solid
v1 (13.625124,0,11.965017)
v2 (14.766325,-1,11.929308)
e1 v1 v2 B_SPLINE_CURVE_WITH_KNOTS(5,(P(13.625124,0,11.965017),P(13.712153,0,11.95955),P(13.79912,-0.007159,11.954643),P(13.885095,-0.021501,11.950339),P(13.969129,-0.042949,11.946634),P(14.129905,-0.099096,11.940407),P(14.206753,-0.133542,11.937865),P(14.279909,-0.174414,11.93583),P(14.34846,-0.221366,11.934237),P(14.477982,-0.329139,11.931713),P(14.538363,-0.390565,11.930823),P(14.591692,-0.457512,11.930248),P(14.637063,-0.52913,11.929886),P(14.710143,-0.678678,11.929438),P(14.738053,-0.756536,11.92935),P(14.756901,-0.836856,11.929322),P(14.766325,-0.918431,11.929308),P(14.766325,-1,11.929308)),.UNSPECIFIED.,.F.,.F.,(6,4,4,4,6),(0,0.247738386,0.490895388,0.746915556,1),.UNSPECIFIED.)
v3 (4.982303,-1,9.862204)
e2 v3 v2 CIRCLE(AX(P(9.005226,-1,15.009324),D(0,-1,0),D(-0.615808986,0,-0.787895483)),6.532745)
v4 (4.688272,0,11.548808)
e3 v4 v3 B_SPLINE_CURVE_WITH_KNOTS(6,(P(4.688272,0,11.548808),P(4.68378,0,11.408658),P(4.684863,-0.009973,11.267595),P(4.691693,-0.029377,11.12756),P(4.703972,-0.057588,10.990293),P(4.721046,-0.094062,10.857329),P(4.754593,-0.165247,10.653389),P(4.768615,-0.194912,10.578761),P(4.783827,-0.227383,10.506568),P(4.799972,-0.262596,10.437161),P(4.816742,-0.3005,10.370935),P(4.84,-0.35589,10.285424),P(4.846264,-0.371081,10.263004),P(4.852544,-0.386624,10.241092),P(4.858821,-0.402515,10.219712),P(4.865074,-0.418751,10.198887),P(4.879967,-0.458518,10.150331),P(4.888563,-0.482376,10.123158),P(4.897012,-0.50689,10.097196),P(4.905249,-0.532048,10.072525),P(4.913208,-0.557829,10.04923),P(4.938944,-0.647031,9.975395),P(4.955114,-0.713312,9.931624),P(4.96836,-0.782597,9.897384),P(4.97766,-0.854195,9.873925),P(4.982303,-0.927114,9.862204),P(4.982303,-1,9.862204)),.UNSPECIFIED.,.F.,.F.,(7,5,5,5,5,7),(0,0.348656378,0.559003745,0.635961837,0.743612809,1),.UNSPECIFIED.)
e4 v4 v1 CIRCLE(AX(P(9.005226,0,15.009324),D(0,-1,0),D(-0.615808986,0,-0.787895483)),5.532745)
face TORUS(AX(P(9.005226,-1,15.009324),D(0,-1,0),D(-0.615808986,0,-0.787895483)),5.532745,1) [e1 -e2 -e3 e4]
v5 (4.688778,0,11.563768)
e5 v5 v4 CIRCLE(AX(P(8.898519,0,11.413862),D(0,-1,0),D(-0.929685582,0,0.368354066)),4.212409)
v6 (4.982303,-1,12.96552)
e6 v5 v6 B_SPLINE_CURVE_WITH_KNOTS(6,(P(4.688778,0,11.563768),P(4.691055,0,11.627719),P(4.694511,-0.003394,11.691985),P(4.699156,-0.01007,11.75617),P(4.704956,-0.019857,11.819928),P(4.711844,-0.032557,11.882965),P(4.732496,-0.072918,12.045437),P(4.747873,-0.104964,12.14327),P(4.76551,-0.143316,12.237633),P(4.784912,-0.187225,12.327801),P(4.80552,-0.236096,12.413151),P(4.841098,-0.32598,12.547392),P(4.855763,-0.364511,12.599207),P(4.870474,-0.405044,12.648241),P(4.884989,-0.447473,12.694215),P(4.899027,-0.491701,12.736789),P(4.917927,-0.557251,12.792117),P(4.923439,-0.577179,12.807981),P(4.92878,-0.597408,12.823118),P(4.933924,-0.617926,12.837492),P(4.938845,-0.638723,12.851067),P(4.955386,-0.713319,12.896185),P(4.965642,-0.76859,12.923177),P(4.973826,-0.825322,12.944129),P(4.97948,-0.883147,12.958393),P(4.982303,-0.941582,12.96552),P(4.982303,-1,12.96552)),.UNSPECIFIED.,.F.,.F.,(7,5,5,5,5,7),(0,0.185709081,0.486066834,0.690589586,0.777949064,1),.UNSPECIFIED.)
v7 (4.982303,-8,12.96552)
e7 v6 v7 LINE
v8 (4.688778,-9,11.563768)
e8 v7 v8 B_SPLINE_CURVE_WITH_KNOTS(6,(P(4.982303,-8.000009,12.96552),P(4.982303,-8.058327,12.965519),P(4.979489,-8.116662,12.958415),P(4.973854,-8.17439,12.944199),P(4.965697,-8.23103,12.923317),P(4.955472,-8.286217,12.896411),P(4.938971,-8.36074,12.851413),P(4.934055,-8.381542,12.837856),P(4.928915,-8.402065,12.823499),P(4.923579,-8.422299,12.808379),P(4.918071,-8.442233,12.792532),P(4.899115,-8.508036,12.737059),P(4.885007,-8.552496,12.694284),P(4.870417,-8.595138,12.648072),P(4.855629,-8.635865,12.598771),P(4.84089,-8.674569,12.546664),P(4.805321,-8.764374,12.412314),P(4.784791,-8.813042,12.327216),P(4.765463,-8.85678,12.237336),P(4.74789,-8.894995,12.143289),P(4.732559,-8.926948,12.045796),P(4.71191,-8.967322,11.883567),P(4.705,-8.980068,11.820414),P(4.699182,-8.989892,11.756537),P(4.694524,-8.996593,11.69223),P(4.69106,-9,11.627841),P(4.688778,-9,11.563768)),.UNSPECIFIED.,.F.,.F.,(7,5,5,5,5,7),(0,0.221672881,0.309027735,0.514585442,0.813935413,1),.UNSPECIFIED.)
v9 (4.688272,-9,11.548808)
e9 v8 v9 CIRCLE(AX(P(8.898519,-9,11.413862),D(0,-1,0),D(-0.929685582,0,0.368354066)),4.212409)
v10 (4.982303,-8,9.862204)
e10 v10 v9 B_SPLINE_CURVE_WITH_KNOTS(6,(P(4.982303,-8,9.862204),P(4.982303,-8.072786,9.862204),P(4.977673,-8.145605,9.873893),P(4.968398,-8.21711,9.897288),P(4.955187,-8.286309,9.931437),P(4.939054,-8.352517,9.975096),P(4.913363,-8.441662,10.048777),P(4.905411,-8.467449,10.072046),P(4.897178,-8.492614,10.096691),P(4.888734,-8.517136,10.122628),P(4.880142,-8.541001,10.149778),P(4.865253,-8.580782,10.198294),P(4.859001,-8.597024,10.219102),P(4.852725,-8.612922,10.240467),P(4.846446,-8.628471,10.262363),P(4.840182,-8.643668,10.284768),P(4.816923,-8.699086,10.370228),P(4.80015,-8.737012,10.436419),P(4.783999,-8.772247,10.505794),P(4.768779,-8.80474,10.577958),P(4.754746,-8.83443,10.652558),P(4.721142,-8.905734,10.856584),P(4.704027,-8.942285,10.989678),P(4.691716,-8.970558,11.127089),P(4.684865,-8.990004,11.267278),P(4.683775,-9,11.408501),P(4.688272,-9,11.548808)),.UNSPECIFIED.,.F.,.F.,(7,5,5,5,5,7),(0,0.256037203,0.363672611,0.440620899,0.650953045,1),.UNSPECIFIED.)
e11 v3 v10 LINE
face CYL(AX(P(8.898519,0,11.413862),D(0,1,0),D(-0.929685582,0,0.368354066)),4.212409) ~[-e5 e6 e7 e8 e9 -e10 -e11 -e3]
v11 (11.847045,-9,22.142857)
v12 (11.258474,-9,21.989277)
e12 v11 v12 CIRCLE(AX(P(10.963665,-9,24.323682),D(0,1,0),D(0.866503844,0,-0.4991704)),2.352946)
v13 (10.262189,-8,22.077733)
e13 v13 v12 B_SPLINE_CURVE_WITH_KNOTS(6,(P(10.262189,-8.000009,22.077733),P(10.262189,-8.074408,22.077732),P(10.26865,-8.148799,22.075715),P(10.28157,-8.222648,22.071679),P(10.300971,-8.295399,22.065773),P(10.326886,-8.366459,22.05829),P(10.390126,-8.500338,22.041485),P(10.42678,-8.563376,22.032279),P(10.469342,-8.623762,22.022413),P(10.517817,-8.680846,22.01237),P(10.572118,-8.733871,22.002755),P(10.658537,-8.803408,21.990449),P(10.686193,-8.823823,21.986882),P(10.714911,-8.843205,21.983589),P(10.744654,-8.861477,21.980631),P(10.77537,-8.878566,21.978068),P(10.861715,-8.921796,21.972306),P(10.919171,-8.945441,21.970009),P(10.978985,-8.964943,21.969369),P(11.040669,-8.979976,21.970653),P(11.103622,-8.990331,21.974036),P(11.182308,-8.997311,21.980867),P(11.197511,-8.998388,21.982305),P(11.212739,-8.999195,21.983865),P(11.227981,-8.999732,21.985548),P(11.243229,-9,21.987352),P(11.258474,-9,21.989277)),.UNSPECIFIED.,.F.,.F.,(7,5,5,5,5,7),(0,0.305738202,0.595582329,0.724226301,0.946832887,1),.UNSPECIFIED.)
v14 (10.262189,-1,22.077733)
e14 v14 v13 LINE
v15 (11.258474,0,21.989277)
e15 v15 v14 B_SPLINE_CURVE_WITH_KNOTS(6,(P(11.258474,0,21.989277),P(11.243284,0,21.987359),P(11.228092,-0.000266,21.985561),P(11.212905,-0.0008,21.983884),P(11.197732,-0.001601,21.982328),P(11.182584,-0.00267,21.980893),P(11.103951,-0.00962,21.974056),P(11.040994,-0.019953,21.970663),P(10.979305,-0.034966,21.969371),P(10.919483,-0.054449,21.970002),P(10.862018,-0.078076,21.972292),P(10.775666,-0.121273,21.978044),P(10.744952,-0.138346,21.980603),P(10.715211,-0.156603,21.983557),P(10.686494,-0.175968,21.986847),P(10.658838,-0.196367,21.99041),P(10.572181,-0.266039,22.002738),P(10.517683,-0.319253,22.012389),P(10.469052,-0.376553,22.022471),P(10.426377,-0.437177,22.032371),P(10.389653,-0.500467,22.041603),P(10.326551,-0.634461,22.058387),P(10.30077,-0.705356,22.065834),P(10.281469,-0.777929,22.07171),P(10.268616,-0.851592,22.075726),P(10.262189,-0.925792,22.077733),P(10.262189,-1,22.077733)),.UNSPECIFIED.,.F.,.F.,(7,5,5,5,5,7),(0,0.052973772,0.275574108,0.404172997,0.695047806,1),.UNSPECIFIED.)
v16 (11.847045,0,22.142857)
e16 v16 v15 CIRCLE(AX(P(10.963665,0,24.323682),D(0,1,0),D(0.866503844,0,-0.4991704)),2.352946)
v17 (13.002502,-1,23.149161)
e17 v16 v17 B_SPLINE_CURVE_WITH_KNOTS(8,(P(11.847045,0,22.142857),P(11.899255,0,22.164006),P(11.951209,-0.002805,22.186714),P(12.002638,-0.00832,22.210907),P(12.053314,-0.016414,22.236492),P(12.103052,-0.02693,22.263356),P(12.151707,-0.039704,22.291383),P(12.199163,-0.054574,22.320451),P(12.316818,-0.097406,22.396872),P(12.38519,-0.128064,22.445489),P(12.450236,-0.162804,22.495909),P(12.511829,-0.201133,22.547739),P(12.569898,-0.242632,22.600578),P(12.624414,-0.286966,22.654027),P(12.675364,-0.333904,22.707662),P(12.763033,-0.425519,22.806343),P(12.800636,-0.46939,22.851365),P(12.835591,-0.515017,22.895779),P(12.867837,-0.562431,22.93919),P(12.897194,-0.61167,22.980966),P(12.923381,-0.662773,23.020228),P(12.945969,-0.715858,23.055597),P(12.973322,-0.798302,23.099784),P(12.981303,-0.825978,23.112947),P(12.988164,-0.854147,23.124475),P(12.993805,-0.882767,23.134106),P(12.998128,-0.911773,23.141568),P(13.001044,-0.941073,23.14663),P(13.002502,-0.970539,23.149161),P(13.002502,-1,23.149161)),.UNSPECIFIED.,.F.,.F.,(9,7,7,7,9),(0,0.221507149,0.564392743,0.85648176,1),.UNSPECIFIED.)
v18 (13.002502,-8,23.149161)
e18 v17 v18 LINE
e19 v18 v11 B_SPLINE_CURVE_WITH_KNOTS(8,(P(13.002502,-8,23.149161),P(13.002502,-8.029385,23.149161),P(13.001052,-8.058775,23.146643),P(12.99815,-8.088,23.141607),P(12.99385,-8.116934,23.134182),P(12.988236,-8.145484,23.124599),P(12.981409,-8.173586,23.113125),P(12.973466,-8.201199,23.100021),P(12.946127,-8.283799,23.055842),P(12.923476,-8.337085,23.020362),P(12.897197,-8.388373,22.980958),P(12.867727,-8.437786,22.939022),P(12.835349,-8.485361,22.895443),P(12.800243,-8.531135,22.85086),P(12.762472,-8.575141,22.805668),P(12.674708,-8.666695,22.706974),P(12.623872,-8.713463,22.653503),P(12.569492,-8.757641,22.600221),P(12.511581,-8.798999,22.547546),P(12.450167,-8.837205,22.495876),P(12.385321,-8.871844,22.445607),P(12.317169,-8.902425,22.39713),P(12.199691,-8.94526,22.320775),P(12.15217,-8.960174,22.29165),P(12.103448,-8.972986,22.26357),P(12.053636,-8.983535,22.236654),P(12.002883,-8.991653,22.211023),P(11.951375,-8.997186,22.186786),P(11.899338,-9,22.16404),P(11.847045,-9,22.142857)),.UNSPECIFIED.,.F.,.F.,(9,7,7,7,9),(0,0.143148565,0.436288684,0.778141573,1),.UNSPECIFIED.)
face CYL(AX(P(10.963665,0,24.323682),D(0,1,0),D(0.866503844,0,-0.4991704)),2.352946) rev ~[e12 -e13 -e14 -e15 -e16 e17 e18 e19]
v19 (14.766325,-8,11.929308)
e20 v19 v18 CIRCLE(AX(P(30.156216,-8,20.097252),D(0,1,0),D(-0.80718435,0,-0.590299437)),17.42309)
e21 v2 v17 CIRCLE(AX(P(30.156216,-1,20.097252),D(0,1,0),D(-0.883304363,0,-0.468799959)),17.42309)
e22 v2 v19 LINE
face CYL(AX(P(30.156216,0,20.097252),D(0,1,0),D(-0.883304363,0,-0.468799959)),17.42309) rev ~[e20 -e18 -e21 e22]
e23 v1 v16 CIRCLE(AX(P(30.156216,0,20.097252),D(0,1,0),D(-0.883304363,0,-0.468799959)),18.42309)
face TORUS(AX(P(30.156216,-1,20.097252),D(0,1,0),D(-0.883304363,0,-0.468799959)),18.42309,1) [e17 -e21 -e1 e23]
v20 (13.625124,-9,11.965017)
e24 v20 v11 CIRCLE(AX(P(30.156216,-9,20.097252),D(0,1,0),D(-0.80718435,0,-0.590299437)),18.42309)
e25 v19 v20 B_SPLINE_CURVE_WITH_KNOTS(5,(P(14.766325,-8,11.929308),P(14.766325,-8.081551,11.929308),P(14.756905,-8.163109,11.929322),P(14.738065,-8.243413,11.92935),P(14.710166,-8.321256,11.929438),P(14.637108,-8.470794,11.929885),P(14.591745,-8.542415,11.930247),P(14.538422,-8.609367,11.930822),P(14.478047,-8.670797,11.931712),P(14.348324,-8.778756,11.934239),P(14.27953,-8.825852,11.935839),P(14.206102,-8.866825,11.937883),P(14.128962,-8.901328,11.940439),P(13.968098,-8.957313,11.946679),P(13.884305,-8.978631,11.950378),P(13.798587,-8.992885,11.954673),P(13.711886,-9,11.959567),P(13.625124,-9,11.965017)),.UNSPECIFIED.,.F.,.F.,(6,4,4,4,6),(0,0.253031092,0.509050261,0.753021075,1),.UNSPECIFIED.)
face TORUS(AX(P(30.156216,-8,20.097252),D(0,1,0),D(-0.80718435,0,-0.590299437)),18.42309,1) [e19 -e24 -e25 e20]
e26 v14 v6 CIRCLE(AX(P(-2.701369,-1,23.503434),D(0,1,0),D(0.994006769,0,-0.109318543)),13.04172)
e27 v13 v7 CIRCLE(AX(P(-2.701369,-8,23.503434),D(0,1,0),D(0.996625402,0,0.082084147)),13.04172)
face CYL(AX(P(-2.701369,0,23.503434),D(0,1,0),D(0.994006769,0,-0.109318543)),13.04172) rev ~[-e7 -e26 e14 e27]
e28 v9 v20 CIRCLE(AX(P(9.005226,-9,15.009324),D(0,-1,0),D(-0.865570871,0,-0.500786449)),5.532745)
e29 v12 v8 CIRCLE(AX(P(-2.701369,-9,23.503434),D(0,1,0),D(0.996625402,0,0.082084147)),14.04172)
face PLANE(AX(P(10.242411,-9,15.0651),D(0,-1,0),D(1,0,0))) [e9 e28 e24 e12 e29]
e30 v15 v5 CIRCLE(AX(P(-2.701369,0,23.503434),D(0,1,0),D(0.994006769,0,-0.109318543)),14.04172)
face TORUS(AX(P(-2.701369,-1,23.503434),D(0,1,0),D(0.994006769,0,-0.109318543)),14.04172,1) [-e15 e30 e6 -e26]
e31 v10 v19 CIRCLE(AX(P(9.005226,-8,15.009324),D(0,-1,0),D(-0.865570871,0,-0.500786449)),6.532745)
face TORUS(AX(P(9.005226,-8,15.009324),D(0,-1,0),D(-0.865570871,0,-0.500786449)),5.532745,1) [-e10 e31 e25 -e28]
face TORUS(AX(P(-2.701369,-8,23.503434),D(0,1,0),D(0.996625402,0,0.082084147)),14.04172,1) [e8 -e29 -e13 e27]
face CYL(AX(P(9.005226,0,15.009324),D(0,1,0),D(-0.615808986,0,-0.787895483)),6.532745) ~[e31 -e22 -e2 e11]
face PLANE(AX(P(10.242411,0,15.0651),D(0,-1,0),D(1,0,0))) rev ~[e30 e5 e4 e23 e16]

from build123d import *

# Parameters (mm, degrees)
F1_DEPTH    = 9
F2_T2_ANGLE = 69.5952889026
F2_T4_ANGLE = 54.4883301746
F2_T6_ANGLE = 143.7551987737
F3_R        = 1


# Not quite as in the source:
# - a fillet or chamfer that OpenCascade refuses, or shapes differently, is made with other operations: its cross-section is extruded or revolved along the edge and cut away or added


with BuildPart() as f1:
    # F0 (on Front) → F1 (new body)
    with BuildSketch(Plane.XZ):
        with BuildLine():
            ThreePointArc((14.7663247772, 11.9293080643), (12.944509625, 17.3914763041), (13.0025018007, 23.1491606683))
            ThreePointArc((13.0025018007, 23.1491606683), (11.8204746449, 22.132281974), (10.26218878, 22.0777325565))
            ThreePointArc((10.26218878, 22.0777325565), (8.5829178564, 16.9649844736), (4.9823031081, 12.9655198559))
            ThreePointArc((4.9823031081, 12.9655198559), (4.6861100149, 11.4138618351), (4.9823031081, 9.8622038143))
            ThreePointArc((4.9823031081, 9.8622038143), (10.3556125988, 8.6176722475), (14.7663247772, 11.9293080643))
        make_face()
    extrude(amount=F1_DEPTH)

    # F2: fillet of radius 1 on 3 edges, made by hand

    # F2_s1 → F2_t2 (revolve, cut)
    with BuildSketch(Plane(origin=(-1.9409501927, 0, 23.5660641142), x_dir=(0, 1, 0), z_dir=(-0.0820841468, 0, 0.9966254025))):
        with BuildLine():
            ThreePointArc((-8, -12.2787262208), (-8.7071067812, -12.5716194396), (-9, -13.2787262208))
            Line((-9, -13.2787262208), (-9, -12.2787262208))
            Line((-9, -12.2787262208), (-8, -12.2787262208))
        make_face()
    revolve(axis=Axis((-2.70136938, -9, 23.5034344039), (0, 1, 0)), revolution_arc=F2_T2_ANGLE, mode=Mode.SUBTRACT)

    # F2_s3 → F2_t4 (revolve, cut)
    with BuildSketch(Plane(origin=(0.9320888174, 0, -1.2745523028), x_dir=(0, 1, 0), z_dir=(0.5902994367, 0, -0.8071843501))):
        with BuildLine():
            ThreePointArc((-8, 18.7819322745), (-8.7071067812, 18.4890390557), (-9, 17.7819322745))
            Line((-9, 17.7819322745), (-9, 18.7819322745))
            Line((-9, 18.7819322745), (-8, 18.7819322745))
        make_face()
    revolve(axis=Axis((30.156216129, -9, 20.0972519028), (0, 1, 0)), revolution_arc=F2_T4_ANGLE, mode=Mode.SUBTRACT)

    # F2_s5 → F2_t6 (revolve, cut)
    with BuildSketch(Plane(origin=(-4.2476398352, 0, 7.3417188573), x_dir=(0, 1, 0), z_dir=(-0.5007864485, 0, 0.8655708712))):
        with BuildLine():
            ThreePointArc((-8, -8.7783825872), (-8.7071067812, -9.071275806), (-9, -9.7783825872))
            Line((-9, -9.7783825872), (-9, -8.7783825872))
            Line((-9, -8.7783825872), (-8, -8.7783825872))
        make_face()
    revolve(axis=Axis((9.0052261238, -9, 15.0093240152), (0, -1, 0)), revolution_arc=F2_T6_ANGLE, mode=Mode.SUBTRACT)

    # F3#2 (call 1 of 2: OpenCascade refuses the feature's edges together)
    f3_2_edges = [f1.edges().sort_by_distance(p)[0] for p in [
        (8.582918, 0, 16.964984),
    ]]
    fillet(f3_2_edges, radius=F3_R)

    # F3 (call 2 of 2)
    f3_edges = [f1.edges().sort_by_distance(p)[0] for p in [
        (12.94451, 0, 17.391476),
        (10.355613, 0, 8.617672),
    ]]
    fillet(f3_edges, radius=F3_R)


solid = f1.part
